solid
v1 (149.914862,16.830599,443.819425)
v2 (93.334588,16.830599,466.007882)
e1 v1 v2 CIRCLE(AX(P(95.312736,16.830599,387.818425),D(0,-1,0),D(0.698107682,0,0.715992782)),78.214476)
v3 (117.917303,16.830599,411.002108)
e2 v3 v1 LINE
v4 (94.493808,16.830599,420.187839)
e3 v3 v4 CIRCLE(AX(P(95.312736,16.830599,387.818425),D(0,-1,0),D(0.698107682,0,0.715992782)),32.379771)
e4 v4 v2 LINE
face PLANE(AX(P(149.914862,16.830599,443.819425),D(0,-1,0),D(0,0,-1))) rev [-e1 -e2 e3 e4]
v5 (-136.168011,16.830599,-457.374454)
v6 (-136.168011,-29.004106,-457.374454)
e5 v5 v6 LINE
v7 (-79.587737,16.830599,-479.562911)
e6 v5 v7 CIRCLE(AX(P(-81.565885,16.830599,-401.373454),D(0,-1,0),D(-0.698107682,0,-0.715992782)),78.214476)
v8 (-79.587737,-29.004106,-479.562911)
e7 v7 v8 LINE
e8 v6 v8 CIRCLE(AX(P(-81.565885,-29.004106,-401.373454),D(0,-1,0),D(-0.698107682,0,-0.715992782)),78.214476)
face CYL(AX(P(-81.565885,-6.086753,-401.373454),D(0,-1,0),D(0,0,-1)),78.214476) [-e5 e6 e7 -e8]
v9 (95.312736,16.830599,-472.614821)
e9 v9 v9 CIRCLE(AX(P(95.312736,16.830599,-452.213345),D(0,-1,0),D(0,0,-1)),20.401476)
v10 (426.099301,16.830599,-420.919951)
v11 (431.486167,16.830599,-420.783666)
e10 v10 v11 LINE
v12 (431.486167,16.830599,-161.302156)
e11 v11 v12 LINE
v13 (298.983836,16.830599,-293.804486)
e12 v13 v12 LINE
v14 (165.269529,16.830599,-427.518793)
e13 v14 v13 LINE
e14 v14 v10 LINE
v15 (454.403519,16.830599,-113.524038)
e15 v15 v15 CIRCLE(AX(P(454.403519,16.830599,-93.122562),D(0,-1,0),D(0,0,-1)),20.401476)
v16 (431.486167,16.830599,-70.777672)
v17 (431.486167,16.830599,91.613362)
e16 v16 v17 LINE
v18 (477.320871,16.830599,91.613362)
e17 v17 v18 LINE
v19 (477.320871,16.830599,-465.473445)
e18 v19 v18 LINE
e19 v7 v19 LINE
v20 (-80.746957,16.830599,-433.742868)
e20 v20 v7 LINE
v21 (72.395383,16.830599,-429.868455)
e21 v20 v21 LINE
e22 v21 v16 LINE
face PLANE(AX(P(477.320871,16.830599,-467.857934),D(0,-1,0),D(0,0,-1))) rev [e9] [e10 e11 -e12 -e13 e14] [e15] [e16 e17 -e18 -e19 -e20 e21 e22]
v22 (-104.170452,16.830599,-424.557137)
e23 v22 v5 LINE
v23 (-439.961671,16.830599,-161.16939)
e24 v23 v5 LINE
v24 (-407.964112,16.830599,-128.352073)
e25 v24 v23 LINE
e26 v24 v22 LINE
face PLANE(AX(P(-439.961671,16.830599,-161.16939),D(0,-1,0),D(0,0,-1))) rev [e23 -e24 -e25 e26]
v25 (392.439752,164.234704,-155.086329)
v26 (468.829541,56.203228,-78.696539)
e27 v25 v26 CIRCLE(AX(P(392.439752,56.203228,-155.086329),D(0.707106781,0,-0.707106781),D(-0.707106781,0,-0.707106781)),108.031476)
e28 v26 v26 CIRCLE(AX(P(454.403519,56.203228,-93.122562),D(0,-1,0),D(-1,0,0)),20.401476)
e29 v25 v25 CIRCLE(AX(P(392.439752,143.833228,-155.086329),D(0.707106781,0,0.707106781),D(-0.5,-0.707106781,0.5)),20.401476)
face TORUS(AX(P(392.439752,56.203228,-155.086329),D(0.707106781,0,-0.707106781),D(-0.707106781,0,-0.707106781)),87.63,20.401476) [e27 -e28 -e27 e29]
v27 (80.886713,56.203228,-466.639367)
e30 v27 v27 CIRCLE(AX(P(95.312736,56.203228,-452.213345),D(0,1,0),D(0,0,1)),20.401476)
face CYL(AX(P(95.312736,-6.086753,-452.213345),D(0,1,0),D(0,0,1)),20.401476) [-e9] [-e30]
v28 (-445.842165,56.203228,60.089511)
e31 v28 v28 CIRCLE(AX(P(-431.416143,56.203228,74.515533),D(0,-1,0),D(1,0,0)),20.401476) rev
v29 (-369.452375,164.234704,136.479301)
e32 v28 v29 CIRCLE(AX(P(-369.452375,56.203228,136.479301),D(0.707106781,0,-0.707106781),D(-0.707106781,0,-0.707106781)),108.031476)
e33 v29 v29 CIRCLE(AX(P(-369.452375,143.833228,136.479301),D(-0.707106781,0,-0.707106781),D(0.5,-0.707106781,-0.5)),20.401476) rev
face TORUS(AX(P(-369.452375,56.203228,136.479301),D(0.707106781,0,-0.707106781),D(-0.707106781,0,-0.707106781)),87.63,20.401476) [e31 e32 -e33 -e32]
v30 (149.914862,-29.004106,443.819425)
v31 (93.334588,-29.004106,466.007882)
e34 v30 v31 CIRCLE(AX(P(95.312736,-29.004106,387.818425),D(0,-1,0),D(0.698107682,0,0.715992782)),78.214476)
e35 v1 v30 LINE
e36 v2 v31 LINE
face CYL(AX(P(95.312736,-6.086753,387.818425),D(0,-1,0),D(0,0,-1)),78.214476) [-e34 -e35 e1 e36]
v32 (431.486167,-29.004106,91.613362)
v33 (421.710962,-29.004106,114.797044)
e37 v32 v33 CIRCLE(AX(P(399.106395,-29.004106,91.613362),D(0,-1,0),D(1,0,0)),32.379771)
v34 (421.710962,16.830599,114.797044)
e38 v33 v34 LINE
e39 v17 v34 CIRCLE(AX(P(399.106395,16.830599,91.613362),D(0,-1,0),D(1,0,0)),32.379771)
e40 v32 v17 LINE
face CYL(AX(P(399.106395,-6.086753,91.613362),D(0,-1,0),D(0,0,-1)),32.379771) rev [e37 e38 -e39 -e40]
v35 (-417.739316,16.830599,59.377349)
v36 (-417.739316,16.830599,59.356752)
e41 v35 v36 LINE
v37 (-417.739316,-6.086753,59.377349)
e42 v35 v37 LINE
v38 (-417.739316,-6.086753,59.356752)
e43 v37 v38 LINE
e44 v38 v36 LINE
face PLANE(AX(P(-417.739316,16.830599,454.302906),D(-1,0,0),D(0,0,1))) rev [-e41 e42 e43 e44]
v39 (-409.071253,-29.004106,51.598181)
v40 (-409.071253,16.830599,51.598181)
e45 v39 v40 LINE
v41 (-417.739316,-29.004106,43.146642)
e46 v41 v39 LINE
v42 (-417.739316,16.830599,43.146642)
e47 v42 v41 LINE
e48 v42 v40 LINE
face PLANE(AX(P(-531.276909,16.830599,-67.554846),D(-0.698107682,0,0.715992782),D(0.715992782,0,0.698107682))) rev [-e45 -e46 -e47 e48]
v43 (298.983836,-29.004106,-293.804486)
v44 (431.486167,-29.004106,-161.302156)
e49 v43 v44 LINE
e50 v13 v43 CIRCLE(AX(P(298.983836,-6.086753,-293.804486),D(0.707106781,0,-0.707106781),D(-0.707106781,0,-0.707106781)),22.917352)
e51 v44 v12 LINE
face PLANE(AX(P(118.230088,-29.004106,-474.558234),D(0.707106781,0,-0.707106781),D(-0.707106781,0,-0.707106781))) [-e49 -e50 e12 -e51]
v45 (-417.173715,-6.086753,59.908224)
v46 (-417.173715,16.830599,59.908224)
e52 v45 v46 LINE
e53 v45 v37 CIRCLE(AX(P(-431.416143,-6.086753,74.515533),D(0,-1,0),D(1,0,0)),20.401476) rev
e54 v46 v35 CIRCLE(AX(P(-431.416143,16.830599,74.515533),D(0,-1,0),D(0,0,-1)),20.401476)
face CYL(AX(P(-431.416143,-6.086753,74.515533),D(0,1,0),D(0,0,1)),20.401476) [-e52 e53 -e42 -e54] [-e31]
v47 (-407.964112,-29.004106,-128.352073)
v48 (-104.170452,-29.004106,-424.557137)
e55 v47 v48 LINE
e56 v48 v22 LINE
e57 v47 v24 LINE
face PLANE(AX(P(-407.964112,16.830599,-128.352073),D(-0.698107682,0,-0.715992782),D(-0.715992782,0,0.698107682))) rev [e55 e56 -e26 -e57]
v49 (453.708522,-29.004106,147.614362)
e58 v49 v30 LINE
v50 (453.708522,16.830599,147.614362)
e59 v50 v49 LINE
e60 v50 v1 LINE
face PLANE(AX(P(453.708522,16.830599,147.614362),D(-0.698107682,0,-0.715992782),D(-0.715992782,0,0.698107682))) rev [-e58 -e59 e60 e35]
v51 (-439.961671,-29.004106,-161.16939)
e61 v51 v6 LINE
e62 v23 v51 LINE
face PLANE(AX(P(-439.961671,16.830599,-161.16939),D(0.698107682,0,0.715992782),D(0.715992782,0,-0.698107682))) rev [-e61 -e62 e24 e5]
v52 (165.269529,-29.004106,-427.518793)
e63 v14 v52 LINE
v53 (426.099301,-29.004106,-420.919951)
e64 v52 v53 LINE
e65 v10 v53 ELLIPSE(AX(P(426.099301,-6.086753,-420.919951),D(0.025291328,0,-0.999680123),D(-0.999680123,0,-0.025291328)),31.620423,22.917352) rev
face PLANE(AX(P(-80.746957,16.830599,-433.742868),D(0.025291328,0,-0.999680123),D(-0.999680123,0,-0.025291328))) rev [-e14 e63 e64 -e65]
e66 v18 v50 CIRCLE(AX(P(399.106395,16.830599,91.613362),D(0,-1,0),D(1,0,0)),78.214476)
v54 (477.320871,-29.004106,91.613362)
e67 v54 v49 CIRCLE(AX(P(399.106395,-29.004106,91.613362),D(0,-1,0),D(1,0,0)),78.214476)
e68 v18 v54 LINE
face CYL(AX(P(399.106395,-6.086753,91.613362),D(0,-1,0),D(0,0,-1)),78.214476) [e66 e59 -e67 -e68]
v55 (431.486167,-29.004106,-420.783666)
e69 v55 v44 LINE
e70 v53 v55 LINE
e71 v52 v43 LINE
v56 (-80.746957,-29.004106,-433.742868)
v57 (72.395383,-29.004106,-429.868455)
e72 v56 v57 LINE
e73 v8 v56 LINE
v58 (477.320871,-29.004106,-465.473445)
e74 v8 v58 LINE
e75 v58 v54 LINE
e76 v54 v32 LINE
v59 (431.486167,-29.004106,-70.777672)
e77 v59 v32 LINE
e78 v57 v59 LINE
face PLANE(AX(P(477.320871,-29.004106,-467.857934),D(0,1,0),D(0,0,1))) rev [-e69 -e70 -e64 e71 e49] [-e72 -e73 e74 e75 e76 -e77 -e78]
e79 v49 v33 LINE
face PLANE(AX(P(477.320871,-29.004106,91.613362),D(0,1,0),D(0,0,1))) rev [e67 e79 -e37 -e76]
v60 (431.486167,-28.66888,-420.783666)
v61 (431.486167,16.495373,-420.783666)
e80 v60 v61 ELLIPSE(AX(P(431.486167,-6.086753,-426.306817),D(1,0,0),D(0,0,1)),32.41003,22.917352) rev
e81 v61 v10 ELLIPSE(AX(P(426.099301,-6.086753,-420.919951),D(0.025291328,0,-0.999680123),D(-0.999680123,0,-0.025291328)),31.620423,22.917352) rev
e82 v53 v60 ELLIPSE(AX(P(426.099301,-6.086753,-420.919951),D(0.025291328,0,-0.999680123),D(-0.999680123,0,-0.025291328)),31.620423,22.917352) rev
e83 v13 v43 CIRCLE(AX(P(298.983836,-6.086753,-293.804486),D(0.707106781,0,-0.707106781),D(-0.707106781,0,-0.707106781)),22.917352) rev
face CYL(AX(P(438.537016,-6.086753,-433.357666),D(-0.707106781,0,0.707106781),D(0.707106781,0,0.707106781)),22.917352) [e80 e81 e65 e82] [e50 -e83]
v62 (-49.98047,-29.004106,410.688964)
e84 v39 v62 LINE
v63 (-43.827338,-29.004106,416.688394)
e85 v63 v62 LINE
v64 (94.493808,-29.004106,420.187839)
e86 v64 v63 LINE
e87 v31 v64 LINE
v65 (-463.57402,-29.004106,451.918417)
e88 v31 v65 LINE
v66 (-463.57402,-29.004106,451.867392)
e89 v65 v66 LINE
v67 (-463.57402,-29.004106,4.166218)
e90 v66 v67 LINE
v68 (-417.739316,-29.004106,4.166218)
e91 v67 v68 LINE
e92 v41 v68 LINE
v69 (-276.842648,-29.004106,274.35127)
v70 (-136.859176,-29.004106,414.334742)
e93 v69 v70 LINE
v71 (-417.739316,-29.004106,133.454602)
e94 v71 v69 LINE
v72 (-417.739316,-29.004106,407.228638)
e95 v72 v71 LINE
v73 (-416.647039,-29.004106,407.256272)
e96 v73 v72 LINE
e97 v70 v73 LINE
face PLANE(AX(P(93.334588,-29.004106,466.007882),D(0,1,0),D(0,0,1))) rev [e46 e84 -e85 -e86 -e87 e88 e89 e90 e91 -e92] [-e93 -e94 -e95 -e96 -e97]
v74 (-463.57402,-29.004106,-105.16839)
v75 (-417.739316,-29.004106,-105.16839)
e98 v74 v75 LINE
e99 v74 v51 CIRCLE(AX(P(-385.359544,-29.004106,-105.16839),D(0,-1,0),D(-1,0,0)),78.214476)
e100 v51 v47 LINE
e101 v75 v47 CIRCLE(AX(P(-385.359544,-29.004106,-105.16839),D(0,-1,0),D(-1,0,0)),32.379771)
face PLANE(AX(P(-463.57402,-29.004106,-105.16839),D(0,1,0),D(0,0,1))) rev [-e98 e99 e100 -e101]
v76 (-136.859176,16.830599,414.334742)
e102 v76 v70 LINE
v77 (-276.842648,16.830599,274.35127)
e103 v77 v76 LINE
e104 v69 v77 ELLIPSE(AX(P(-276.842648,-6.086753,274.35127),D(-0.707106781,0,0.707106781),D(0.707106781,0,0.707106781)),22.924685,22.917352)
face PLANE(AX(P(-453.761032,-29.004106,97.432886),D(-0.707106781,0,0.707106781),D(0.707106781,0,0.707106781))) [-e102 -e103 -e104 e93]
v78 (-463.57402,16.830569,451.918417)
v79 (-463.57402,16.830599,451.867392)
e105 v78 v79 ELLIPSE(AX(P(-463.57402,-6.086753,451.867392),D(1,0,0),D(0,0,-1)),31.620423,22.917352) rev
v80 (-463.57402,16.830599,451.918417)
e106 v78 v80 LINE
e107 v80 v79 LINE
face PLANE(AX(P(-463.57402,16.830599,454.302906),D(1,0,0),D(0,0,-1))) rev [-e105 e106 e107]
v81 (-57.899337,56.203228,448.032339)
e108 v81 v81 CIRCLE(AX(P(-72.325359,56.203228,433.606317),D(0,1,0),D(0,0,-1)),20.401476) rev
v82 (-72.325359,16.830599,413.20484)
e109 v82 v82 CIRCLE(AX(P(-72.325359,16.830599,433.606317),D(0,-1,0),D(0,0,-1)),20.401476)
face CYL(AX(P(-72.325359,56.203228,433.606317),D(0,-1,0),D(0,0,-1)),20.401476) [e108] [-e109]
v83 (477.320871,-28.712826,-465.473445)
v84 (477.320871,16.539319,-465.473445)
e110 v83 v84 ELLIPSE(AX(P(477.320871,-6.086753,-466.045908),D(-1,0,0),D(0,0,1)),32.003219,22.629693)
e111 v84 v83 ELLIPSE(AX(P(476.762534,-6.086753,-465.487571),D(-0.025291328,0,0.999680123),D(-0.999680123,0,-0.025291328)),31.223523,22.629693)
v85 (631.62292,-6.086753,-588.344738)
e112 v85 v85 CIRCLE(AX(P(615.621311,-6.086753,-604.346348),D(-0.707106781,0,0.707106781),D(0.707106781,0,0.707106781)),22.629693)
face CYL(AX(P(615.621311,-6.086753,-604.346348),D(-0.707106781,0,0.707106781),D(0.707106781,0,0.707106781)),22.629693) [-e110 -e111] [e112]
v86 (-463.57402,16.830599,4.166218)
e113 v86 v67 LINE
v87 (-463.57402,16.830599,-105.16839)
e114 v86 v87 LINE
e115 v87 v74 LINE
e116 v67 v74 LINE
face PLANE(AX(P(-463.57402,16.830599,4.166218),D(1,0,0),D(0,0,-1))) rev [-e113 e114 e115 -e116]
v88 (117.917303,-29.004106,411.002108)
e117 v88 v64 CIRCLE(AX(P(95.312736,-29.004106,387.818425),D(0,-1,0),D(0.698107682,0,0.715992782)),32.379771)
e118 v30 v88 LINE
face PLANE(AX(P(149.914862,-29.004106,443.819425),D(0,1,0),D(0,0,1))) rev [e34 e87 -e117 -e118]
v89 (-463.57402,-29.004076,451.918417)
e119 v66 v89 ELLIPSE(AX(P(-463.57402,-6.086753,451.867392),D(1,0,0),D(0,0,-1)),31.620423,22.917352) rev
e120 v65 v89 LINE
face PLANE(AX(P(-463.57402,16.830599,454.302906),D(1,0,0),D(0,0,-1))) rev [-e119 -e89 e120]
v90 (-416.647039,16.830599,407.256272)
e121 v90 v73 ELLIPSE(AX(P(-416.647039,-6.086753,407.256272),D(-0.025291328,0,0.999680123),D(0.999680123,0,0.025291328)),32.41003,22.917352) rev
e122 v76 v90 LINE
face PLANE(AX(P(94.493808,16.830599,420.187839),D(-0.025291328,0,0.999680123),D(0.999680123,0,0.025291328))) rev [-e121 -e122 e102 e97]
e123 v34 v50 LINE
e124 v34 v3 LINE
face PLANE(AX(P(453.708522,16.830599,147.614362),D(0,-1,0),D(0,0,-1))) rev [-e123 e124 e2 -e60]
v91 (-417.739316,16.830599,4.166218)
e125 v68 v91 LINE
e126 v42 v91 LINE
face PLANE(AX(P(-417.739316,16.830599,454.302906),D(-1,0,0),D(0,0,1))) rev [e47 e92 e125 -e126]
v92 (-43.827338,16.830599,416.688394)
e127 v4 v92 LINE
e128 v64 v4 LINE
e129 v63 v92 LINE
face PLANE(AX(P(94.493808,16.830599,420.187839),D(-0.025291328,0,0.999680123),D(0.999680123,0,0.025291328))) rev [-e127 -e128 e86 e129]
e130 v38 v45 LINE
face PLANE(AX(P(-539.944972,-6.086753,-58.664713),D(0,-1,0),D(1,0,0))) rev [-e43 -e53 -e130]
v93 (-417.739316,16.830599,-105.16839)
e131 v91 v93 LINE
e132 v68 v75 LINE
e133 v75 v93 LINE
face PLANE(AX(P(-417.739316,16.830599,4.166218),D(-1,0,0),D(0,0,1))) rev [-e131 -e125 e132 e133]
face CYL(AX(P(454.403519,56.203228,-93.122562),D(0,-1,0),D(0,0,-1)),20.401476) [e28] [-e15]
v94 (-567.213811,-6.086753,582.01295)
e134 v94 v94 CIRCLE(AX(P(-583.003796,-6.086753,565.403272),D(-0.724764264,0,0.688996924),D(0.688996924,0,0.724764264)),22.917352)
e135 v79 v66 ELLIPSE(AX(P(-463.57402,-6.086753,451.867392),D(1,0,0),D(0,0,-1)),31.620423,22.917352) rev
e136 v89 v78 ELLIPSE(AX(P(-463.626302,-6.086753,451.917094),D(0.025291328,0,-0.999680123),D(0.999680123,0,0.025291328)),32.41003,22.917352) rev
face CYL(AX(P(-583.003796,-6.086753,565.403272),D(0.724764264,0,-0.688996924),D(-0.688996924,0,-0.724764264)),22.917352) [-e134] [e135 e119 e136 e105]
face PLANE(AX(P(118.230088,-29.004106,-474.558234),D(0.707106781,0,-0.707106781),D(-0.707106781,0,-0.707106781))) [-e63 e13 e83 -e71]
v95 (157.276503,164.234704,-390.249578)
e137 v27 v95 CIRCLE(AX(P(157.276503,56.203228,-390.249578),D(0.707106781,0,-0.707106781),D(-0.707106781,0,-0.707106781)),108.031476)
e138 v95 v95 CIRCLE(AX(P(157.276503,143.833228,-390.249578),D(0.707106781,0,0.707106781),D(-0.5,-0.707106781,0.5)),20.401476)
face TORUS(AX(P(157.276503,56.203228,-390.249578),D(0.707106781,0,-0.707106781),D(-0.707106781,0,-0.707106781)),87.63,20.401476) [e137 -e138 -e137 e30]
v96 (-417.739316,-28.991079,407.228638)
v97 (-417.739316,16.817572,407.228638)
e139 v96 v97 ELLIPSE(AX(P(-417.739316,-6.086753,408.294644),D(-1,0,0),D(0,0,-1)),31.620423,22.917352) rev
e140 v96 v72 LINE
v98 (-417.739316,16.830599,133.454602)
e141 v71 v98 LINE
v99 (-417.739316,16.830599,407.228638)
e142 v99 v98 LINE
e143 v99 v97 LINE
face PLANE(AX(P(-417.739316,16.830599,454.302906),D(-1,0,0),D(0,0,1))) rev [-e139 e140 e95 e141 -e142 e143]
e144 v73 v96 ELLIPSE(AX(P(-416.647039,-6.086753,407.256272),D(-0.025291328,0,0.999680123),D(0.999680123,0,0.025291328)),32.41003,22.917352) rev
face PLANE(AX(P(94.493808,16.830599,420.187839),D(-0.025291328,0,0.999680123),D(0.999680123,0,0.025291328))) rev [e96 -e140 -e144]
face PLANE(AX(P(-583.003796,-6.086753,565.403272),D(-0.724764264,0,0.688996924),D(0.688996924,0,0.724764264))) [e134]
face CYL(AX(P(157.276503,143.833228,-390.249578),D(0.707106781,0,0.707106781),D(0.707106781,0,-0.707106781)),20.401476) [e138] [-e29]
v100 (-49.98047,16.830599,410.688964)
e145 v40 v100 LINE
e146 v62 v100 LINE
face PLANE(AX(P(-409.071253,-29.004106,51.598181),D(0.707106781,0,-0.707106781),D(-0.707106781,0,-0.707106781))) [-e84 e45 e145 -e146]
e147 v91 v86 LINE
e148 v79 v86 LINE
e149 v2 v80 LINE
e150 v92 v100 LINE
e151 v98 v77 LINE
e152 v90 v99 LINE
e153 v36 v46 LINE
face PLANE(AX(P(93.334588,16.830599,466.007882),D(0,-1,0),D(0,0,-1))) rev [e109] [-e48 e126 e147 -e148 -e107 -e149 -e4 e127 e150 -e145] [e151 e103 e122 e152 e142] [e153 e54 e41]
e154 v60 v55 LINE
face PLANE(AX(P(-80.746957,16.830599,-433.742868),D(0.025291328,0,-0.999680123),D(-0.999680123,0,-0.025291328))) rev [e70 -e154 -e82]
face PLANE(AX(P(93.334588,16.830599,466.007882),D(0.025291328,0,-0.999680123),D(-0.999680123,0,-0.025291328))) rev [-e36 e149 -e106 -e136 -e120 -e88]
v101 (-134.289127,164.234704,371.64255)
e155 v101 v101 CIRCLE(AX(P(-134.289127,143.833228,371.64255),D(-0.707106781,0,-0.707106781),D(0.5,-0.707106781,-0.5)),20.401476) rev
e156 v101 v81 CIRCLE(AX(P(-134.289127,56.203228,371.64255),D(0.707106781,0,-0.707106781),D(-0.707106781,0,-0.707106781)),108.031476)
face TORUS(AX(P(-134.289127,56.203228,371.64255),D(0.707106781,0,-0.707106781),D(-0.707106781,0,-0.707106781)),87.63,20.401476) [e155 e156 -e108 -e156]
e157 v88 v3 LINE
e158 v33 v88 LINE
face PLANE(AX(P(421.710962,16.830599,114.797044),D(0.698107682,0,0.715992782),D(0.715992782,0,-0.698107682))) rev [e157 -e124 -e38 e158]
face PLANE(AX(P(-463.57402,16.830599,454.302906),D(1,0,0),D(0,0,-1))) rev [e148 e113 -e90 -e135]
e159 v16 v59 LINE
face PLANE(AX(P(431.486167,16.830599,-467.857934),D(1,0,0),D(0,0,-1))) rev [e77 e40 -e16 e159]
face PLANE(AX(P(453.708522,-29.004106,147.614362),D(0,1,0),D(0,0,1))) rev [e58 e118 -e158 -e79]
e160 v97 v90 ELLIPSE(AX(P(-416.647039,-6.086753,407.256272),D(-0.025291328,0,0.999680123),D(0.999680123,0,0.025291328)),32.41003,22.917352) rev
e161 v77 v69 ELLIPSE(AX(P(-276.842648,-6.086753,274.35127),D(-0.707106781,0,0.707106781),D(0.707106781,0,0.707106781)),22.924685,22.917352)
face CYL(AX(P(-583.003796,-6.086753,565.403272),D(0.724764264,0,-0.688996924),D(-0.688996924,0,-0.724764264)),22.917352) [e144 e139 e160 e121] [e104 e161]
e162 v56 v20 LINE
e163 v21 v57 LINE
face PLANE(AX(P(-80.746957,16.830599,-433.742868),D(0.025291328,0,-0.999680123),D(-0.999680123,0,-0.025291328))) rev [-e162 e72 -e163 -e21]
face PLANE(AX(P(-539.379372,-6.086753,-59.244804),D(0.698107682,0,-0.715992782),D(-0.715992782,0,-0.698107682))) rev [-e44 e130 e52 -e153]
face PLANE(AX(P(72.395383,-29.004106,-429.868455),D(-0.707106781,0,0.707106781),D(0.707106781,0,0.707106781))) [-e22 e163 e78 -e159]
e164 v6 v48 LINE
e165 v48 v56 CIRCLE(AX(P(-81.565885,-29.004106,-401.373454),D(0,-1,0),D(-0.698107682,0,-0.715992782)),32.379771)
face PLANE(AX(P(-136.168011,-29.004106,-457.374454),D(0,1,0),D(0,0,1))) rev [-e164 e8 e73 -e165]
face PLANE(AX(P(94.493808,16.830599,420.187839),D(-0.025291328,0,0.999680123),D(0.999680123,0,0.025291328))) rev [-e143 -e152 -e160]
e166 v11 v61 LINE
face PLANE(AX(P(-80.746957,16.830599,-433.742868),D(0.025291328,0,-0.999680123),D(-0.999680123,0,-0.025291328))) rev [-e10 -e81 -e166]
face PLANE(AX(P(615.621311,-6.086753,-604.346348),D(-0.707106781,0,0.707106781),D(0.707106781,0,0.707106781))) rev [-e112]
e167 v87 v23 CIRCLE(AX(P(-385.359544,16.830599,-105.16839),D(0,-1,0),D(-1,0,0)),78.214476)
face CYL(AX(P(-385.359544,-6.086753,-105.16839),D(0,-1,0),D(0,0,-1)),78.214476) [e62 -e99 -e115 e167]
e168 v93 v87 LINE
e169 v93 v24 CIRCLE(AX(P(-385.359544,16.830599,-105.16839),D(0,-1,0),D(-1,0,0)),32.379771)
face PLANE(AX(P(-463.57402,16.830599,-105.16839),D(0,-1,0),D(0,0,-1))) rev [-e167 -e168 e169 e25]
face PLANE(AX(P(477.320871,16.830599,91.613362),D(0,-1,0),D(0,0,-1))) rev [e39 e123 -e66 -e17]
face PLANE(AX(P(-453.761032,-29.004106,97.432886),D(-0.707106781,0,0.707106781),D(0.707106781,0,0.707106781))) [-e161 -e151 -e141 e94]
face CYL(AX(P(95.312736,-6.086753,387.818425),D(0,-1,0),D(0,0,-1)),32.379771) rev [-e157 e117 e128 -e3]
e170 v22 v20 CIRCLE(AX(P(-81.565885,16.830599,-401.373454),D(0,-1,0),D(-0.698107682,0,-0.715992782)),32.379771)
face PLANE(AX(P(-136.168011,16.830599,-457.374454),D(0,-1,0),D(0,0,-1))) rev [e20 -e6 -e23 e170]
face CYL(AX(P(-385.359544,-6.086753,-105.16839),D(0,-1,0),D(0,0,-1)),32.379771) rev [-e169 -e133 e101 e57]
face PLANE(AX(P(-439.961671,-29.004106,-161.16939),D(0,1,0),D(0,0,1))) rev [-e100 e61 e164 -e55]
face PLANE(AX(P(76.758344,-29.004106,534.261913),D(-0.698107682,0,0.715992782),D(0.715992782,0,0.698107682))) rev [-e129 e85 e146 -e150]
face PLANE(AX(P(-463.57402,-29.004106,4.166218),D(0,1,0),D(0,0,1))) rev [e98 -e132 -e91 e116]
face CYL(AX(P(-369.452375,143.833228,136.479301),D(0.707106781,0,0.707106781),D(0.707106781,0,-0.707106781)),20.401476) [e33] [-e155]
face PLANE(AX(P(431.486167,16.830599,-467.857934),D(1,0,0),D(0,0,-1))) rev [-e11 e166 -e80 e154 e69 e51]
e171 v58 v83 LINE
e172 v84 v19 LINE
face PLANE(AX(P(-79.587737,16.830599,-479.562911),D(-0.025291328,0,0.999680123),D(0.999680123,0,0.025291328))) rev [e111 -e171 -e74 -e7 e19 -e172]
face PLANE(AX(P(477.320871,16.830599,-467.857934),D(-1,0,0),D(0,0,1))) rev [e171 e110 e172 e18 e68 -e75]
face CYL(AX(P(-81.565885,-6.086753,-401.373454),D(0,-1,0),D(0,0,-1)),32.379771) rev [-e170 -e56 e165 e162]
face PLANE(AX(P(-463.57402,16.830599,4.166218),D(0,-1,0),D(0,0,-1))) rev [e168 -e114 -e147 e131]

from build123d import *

# Parameters (mm, degrees)
SWEEP1_START        = -15.278234842
SWEEP1_DEPTH        = 30.556469684
SKETCH6_R           = 13.600984241
SKETCH8_W           = 42.677063854
SKETCH8_H           = 30.556469684
SKETCH9_R           = 15.278234842
BOSS_EXTRUDE1_DEPTH = 131.572
SKETCH10_R          = 15.08646221
BOSS_EXTRUDE2_DEPTH = 162.052
SKETCH11_R          = 15.278234842
BOSS_EXTRUDE3_DEPTH = 296.164
BOSS_EXTRUDE4_REACH = 754.5
BOSS_EXTRUDE5_REACH = 752.76
SKETCH13_W          = 5.310182484
SKETCH13_H          = 30.556469684
SCALE1_SCALE        = 1.5


# Read off the part's stored shape, not the designer's step: Sweep1
with BuildPart() as part:
    # Sweep1 outline → Sweep1 (new body)
    with BuildSketch(Plane(origin=(0, 0, 0), x_dir=(1, 0, 0), z_dir=(0, 1, 0)).offset(SWEEP1_START)):
        with BuildLine():
            Line((-306.148893999, 72.889739207), (-306.148893999, -298.501465503))
            Line((-306.148893999, -298.501465503), (65.123511279, -307.894442395))
            ThreePointArc((65.123511279, -307.894442395), (85.479114327, -304.311825152), (102.843694212, -293.102137949))
            Line((102.843694212, -293.102137949), (305.372800707, -95.632095493))
            ThreePointArc((305.372800707, -95.632095493), (317.018075483, -78.556578014), (321.114366969, -58.2980954))
            Line((321.114366969, -58.2980954), (321.114366969, 313.093109311))
            Line((321.114366969, 313.093109311), (-50.15803831, 322.486086202))
            ThreePointArc((-50.15803831, 322.486086202), (-70.513641359, 318.90346896), (-87.878221243, 307.693781756))
            Line((-87.878221243, 307.693781756), (-290.407327738, 110.2237393))
            ThreePointArc((-290.407327738, 110.2237393), (-302.052602513, 93.148221821), (-306.148893999, 72.889739207))
        make_face()
        with BuildLine():
            Line((-275.592424315, -268.708279376), (-275.592424315, 72.889739207))
            ThreePointArc((-275.592424315, 72.889739207), (-273.896613149, 81.276486376), (-269.075621512, 88.345527557))
            Line((-269.075621512, 88.345527557), (-66.546515017, 285.815570013))
            ThreePointArc((-66.546515017, 285.815570013), (-59.357805776, 290.456234084), (-50.930852017, 291.939390823))
            Line((-50.930852017, 291.939390823), (290.557897284, 283.299923184))
            Line((290.557897284, 283.299923184), (290.557897284, -58.2980954))
            ThreePointArc((290.557897284, -58.2980954), (288.862086118, -66.684842568), (284.041094482, -73.753883749))
            Line((284.041094482, -73.753883749), (81.511987987, -271.223926205))
            ThreePointArc((81.511987987, -271.223926205), (74.323278746, -275.864590277), (65.896324986, -277.347747016))
            Line((65.896324986, -277.347747016), (-275.592424315, -268.708279376))
        make_face(mode=Mode.SUBTRACT)
    extrude(amount=SWEEP1_DEPTH)

    # Sweep2: sweep along a path in Sketch5
    with BuildLine(Plane(origin=(185.347659395, 0, -185.347659395), x_dir=(0.7071067811865562, 0, 0.7071067811865388), z_dir=(-0.7071067811865388, 0, 0.7071067811865562))) as sweep2_path:
        Line((170.396432247, 0), (170.396432247, 41.52665431))
        ThreePointArc((170.396432247, 41.52665431), (153.285610404, 82.835832467), (111.976432247, 99.94665431))
        Line((111.976432247, 99.94665431), (-109.737604983, 99.94665431))
        ThreePointArc((-109.737604983, 99.94665431), (-151.046783139, 82.835832467), (-168.157604983, 41.52665431))
        Line((-168.157604983, 41.52665431), (-168.157604983, 0))
    # Sketch6 → Sweep2 (sweep)
    with BuildSketch(Plane(origin=(0, 0, 0), x_dir=(1, 0, 0), z_dir=(0, 1, 0))):
        with Locations((66.442276603, 304.253042186)):
            Circle(SKETCH6_R)
    sweep2 = sweep(path=sweep2_path.line)

    # Sweep3: sweep along a path in Sketch7
    with BuildLine(Plane(origin=(185.347659395, 0, -185.347659395), x_dir=(0.7071067811865562, 0, 0.7071067811865388), z_dir=(-0.7071067811865388, 0, 0.7071067811865562))) as sweep3_path:
        Line((-168.157604983, 0), (170.396432247, 0))
    # Sketch8 → Sweep3 (sweep)
    with BuildSketch(Plane(origin=(-119.696927762, 0, -122.763491253), x_dir=(0.7159927821962476, 0, -0.6981076821256709), z_dir=(0.6981076821256709, 0, 0.7159927821962476))):
        with Locations((259.973576541, 0)):
            Rectangle(SKETCH8_W, SKETCH8_H)
    sweep3 = sweep(path=sweep3_path.line)

    # Sketch9 → Boss-Extrude1 (add)
    with BuildSketch(Plane(origin=(200.435073348, 0, -200.435073348), x_dir=(-0.7071067811865562, -4.438233130955744e-13, -0.7071067811865388), z_dir=(0.7071067811865388, -4.438233130955853e-13, -0.7071067811865562))):
        with Locations(Location((-2.528524686, 0, 0), (0, 0, 90))):
            Circle(SKETCH9_R)
    extrude(amount=BOSS_EXTRUDE1_DEPTH)

    # Sketch10 → Boss-Extrude2 (add)
    with BuildSketch(Plane(origin=(294.906784072, 0, -294.906784072), x_dir=(0.7071067811865562, 0, 0.7071067811865388), z_dir=(-0.7071067811865388, 0, 0.7071067811865562))):
        with Locations((5.402024194, 0)):
            Circle(SKETCH10_R)
    extrude(amount=-BOSS_EXTRUDE2_DEPTH)

    # Sketch11 → Boss-Extrude3 (add)
    with BuildSketch(Plane(origin=(-174.828459041, 0, 166.200620773), x_dir=(0.6889969243726892, 0, 0.7247642638851441), z_dir=(-0.7247642638851441, 0, 0.6889969243726892))):
        with Locations(Location((5.382894592, 0, 0), (0, 0, 268.068044215))):
            Circle(SKETCH11_R)
    extrude(amount=BOSS_EXTRUDE3_DEPTH)

    # Mirror1: Sweep2, Sweep3 across plane
    add(sweep2.mirror(Plane(origin=(9.771366639, 0, -9.771366639), x_dir=(0.7071067811865562, 0, 0.7071067811865388), z_dir=(-0.7071067811865388, 0, 0.7071067811865562))))
    add(sweep3.mirror(Plane(origin=(9.771366639, 0, -9.771366639), x_dir=(0.7071067811865562, 0, 0.7071067811865388), z_dir=(-0.7071067811865388, 0, 0.7071067811865562))))

    # Sketch12 → Boss-Extrude4 (add, up to next)
    with BuildSketch(Plane(origin=(-122.513234778, 0, -119.452922553), x_dir=(-0.6981076821256531, 1.4154863240378708e-15, 0.715992782196265), z_dir=(-0.715992782196265, 1.4517502346095406e-15, -0.6981076821256531)), mode=Mode.PRIVATE) as boss_extrude4_sk1:
        Polygon((219.277331358, -15.278234842), (219.277331358, 0), (218.737204096, 0), (218.737204096, 15.278234842), (210.99965641, 15.278234842), (210.99965641, -15.278234842), align=None)
    boss_extrude4_tool1 = extrude(boss_extrude4_sk1.sketch, amount=BOSS_EXTRUDE4_REACH, mode=Mode.PRIVATE) - part.part
    add(boss_extrude4_tool1.solids().sort_by_distance((-272.611983, -0.257636, 34.491265))[0])

    # Sketch13 → Boss-Extrude5 (add, up to next)
    with BuildSketch(Plane(origin=(119.869626773, 0, 116.875350401), x_dir=(0.6981076821256531, -1.4154863240378708e-15, -0.715992782196265), z_dir=(0.715992782196265, -1.4517502346095406e-15, 0.6981076821256531)), mode=Mode.PRIVATE) as boss_extrude5_sk1:
        with Locations((-217.936330715, 0)):
            Rectangle(SKETCH13_W, SKETCH13_H)
    boss_extrude5_tool1 = extrude(boss_extrude5_sk1.sketch, amount=BOSS_EXTRUDE5_REACH, mode=Mode.PRIVATE) - part.part
    add(boss_extrude5_tool1.solids().sort_by_distance((-32.2734, 0, 272.91619))[0])


with BuildPart() as part_1:
    # Scale1: scaled about (8.702201295, 12.173569048, -8.333178584)
    add(part.part.scale(SCALE1_SCALE).moved(Location((-4.351100648, -6.086784524, 4.166589292))))


solid = part_1.part
